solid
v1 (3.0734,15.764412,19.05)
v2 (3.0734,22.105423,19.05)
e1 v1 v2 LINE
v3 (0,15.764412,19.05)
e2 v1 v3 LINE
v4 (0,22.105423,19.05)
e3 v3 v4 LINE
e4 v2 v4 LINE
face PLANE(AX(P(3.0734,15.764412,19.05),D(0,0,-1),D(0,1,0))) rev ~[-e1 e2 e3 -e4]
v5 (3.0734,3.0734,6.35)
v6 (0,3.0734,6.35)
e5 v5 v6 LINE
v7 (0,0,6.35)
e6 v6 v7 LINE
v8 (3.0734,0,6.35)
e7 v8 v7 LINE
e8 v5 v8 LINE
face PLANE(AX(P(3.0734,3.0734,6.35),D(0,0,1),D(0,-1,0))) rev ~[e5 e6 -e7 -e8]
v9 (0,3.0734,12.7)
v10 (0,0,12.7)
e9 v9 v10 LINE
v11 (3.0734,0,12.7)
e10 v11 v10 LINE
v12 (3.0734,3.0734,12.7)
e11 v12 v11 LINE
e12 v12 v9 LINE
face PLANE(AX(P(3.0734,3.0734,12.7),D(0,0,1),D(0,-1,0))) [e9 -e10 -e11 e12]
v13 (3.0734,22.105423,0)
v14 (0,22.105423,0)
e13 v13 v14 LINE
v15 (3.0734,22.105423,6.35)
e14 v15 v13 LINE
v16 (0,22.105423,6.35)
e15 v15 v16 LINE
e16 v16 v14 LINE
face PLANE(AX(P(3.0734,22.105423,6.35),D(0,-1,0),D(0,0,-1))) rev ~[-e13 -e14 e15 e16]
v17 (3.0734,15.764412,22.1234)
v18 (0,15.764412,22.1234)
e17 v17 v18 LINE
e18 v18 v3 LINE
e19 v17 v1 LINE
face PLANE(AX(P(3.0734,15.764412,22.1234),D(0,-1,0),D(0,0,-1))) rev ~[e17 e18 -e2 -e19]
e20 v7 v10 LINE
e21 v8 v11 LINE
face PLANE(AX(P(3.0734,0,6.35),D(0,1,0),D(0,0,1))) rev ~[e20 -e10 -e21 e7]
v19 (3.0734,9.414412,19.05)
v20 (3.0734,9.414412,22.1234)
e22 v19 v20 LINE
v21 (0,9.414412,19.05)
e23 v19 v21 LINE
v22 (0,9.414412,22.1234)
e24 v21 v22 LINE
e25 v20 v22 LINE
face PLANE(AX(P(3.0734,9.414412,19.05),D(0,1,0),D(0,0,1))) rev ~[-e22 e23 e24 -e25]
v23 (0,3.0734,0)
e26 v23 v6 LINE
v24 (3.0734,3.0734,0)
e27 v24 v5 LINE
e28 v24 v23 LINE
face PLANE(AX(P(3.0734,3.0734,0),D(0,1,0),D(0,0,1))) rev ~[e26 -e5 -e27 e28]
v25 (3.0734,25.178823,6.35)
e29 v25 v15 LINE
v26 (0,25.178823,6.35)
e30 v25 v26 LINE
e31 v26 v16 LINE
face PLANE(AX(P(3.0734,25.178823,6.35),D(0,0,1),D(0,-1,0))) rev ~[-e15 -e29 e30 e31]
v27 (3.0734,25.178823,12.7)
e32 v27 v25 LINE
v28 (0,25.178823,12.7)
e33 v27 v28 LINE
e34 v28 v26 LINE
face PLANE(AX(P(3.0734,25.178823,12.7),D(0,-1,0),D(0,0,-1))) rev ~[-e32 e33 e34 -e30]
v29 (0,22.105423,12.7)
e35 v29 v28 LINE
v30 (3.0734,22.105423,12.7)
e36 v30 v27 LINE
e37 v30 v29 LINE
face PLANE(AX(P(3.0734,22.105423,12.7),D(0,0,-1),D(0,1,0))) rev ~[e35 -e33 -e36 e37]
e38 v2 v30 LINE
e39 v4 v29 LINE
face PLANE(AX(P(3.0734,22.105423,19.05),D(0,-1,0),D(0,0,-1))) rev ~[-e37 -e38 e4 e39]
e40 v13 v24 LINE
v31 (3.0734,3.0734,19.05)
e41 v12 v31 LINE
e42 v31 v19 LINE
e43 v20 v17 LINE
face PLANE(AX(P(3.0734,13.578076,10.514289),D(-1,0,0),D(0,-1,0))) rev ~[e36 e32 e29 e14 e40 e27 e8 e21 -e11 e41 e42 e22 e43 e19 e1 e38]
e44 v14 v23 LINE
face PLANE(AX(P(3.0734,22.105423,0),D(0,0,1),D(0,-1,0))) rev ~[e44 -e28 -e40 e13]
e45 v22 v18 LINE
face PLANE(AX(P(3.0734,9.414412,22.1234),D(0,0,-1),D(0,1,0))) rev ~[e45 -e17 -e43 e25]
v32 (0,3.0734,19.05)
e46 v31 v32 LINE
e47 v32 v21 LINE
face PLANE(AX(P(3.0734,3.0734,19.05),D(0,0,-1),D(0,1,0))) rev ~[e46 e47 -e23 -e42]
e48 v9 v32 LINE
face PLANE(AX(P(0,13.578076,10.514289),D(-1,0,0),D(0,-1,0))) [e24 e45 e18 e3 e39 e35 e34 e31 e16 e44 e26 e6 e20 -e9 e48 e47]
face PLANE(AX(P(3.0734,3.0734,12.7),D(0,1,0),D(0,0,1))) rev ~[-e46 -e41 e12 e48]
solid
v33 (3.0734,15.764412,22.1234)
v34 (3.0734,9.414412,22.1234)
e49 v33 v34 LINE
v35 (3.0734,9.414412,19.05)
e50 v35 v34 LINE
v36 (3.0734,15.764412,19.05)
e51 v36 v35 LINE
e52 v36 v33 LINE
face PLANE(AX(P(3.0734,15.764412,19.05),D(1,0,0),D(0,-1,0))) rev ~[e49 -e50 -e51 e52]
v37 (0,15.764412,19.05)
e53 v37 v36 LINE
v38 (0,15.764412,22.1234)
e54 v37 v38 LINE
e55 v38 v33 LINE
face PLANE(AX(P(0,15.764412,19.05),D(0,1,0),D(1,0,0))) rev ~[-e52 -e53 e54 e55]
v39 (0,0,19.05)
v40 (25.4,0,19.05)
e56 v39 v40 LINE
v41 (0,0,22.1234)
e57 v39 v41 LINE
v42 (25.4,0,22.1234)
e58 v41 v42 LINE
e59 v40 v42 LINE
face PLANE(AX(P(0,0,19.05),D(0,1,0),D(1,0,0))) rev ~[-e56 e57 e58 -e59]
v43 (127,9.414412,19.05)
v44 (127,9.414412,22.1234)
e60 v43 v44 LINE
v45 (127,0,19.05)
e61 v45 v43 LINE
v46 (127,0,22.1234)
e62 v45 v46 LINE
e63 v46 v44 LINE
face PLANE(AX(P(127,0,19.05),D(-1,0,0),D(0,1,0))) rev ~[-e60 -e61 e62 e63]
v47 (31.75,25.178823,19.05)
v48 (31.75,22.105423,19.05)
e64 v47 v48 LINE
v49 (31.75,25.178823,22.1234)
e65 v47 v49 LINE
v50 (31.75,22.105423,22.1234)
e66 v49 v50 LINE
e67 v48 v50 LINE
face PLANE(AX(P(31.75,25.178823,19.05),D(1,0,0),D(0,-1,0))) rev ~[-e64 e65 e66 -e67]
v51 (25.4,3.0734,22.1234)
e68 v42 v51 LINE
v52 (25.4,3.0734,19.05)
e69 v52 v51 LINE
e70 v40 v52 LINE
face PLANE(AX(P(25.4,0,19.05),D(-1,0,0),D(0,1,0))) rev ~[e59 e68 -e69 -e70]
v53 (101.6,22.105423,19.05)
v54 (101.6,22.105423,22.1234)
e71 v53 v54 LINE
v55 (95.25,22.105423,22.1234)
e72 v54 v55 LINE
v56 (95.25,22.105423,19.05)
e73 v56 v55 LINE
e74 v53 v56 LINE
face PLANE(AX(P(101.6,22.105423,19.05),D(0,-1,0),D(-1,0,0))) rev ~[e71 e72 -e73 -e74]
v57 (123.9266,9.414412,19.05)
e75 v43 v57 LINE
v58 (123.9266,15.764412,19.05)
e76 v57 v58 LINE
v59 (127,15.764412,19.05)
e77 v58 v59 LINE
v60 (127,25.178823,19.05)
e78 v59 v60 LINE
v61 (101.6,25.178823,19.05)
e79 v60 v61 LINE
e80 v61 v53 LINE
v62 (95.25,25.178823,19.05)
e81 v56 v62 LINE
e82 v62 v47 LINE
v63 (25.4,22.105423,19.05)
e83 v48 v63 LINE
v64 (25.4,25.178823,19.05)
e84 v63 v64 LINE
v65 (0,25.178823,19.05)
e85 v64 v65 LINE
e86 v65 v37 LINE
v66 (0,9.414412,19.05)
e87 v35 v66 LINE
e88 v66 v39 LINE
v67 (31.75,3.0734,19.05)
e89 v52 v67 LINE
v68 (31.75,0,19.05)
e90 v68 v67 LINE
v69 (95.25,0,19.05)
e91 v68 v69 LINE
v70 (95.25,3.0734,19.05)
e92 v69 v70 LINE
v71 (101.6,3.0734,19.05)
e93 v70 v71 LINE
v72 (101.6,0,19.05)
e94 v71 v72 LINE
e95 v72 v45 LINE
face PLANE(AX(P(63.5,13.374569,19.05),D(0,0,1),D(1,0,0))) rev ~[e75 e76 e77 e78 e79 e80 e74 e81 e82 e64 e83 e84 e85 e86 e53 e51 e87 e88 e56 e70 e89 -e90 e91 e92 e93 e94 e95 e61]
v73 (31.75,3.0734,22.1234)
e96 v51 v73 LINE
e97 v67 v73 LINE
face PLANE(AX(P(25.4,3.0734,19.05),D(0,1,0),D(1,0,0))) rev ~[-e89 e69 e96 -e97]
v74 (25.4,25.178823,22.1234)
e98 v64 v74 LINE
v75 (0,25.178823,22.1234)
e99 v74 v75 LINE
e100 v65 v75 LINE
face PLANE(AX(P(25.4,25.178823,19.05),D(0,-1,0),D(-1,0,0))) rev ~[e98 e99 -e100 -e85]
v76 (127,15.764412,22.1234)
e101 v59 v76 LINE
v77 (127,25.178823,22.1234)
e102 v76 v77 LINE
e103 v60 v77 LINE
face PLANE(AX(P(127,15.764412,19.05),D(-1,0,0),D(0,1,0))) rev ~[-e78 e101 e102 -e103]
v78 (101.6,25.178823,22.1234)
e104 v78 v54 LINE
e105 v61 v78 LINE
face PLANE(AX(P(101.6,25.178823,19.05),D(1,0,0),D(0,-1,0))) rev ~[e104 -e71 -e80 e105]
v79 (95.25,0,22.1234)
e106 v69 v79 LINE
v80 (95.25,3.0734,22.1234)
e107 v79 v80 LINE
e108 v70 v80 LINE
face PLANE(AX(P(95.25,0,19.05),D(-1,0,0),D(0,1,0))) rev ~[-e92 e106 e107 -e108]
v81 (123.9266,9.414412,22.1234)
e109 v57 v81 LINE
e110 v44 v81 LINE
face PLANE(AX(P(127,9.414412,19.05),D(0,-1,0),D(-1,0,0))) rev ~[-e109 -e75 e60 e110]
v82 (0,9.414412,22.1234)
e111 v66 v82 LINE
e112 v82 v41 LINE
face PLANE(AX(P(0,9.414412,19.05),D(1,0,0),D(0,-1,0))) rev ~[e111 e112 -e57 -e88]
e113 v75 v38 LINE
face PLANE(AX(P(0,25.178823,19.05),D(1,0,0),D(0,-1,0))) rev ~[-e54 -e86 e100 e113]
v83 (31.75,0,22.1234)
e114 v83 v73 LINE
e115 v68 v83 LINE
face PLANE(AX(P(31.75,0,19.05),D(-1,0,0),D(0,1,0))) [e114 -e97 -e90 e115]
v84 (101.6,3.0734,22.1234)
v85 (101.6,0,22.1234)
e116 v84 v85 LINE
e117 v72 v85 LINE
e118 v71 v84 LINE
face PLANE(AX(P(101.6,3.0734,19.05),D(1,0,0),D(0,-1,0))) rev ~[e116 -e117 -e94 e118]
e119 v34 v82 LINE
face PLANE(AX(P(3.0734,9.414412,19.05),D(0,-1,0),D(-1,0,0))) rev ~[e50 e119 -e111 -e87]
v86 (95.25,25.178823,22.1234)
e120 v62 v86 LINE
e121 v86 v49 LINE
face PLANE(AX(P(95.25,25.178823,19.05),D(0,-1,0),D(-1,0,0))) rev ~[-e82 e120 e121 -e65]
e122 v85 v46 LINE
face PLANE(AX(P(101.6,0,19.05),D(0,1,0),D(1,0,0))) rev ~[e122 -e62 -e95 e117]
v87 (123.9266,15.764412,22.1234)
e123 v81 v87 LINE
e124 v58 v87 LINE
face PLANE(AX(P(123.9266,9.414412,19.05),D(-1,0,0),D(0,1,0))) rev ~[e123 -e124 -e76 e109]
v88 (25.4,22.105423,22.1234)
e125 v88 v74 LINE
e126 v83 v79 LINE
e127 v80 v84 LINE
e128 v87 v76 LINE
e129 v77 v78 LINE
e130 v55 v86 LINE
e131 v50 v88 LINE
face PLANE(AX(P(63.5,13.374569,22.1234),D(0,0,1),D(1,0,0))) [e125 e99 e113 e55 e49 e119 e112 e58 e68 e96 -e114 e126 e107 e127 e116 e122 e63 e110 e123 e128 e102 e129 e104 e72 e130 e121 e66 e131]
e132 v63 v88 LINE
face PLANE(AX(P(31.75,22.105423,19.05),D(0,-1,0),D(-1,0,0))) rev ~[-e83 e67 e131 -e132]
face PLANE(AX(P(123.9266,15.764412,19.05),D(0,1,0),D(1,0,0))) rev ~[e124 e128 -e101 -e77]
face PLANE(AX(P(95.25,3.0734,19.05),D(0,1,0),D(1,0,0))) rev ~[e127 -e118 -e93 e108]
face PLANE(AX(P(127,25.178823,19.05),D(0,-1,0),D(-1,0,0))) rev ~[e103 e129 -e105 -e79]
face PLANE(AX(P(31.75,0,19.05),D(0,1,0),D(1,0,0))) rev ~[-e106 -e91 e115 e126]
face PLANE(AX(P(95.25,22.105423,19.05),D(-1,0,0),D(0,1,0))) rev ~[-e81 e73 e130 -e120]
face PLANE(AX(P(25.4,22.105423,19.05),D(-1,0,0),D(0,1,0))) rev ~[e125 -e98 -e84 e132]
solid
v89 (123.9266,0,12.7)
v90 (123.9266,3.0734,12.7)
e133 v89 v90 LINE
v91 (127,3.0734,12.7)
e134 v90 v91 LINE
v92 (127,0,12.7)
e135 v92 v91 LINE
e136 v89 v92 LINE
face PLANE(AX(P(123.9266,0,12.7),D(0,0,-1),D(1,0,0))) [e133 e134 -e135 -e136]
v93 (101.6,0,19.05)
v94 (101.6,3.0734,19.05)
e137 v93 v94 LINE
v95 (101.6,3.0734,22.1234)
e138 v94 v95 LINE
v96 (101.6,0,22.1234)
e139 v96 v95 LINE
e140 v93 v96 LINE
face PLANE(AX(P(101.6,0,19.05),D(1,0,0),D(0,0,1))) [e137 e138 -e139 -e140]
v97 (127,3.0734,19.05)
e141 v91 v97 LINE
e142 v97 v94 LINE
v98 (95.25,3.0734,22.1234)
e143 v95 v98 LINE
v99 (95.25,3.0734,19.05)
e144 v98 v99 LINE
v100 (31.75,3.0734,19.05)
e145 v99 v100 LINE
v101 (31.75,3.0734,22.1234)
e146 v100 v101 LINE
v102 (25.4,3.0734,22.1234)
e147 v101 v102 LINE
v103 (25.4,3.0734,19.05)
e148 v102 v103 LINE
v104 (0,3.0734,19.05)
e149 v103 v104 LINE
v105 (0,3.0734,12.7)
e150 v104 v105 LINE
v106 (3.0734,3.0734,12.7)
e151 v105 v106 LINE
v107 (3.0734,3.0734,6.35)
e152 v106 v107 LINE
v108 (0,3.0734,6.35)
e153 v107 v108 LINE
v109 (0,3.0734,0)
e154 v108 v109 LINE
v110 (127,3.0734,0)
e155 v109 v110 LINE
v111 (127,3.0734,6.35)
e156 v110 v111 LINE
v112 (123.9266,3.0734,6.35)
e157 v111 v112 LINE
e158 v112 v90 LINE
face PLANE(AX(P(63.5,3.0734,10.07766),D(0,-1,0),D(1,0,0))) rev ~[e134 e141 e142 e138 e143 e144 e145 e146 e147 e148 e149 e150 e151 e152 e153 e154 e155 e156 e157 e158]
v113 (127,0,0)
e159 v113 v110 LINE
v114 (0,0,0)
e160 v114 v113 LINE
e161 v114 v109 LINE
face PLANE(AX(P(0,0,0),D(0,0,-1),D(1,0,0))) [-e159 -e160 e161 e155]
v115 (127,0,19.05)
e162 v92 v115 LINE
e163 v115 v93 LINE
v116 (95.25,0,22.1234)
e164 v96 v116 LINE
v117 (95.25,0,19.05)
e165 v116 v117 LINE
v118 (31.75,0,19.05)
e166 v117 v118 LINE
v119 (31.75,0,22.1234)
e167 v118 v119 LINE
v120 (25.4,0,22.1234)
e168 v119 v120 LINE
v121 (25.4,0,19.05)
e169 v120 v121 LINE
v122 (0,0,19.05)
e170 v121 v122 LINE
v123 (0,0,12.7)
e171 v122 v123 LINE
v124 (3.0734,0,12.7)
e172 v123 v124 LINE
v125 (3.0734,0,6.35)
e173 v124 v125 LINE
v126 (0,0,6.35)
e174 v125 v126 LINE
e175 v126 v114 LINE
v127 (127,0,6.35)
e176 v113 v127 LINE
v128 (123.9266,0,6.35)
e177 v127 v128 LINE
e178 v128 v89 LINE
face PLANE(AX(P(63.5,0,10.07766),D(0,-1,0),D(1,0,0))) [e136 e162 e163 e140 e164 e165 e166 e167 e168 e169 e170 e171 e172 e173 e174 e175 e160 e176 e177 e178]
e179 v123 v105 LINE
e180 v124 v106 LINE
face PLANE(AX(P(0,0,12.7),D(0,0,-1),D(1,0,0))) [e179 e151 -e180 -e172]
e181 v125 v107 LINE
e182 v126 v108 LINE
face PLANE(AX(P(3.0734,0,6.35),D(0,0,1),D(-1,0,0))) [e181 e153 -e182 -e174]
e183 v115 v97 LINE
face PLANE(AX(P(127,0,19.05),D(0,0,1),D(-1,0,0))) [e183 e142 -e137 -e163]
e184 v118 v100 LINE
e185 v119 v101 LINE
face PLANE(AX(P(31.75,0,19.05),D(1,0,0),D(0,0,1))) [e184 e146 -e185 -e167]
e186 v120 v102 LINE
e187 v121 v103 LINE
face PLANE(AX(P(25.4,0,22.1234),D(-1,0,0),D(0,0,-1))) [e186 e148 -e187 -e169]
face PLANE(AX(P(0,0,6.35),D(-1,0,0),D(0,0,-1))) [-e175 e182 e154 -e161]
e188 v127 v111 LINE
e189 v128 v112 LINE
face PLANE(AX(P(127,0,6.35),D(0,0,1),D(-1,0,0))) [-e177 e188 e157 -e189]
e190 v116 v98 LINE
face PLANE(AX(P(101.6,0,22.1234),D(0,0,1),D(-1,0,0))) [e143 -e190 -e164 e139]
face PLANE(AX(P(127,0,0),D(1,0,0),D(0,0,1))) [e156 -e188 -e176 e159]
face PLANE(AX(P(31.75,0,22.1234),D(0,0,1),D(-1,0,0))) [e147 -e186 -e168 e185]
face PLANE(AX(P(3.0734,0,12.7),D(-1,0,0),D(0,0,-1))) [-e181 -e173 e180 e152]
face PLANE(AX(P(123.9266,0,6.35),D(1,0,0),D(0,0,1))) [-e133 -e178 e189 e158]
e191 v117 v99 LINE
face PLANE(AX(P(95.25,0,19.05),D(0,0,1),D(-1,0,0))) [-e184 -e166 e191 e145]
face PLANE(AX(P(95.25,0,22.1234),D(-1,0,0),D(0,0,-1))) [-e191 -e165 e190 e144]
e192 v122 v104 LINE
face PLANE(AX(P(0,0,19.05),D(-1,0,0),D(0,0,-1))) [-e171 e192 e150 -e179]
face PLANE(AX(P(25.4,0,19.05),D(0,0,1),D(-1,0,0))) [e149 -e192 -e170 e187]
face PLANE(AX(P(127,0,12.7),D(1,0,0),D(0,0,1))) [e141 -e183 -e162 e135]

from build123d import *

# Parameters (mm, degrees)
F2_DEPTH = 3.0734
F3_W     = 63.5
F3_H     = 3.0734
F4_DEPTH = 3.0734
F5_W     = 3.0734
F5_H     = 6.35
F6_DEPTH = 3.0734


# Not quite as in the source:
# - a variable given as a bare number and used for a length is read in inches; the dataset says mm whatever the document's units were


with BuildPart() as f2:
    # F1 (on Front) → F2 (new body)
    with BuildSketch(Plane.XZ):
        Polygon((0, 6.35), (0, 0), (127, 0), (127, 6.35), (123.9266, 6.35), (123.9266, 12.7), (127, 12.7), (127, 19.05), (101.6, 19.05), (101.6, 22.1234), (95.25, 22.1234), (95.25, 19.05), (31.75, 19.05), (31.75, 22.1234), (25.4, 22.1234), (25.4, 19.05), (0, 19.05), (0, 12.7), (3.0734, 12.7), (3.0734, 6.35), align=None)
    extrude(amount=-F2_DEPTH)


with BuildPart() as f4:
    # F3 (on face) → F4 (new body)
    with BuildSketch(Plane.XY.offset(19.05)):
        Polygon((0, 0), (25.4, 0), (25.4, 3.0734), (31.75, 3.0734), (95.25, 3.0734), (101.6, 3.0734), (101.6, 0), (127, 0), (127, 9.414411702), (123.9266, 9.414411702), (123.9266, 15.764411702), (127, 15.764411702), (127, 25.178823404), (101.6, 25.178823404), (101.6, 22.105423404), (95.25, 22.105423404), (95.25, 25.178823404), (31.75, 25.178823404), (31.75, 22.105423404), (25.4, 22.105423404), (25.4, 25.178823404), (0, 25.178823404), (0, 15.764411702), (3.0734, 15.764411702), (3.0734, 9.414411702), (0, 9.414411702), align=None)
        with Locations((63.5, 1.5367)):
            Rectangle(F3_W, F3_H)
    extrude(amount=F4_DEPTH)


with BuildPart() as f6:
    # F5 (on face) → F6 (new body)
    with BuildSketch(Plane(origin=(3.0734, 0, 0), x_dir=(0, -1, 0), z_dir=(-1, 0, 0))):
        Polygon((-3.0734, 0), (-3.0734, 6.35), (-3.0734, 12.7), (-3.0734, 19.05), (-9.414411702, 19.05), (-9.414411702, 22.1234), (-15.764411702, 22.1234), (-15.764411702, 19.05), (-22.105423404, 19.05), (-22.105423404, 12.7), (-25.178823404, 12.7), (-25.178823404, 6.35), (-22.105423404, 6.35), (-22.105423404, 0), align=None)
        with Locations((-1.5367, 9.525)):
            Rectangle(F5_W, F5_H)
    extrude(amount=F6_DEPTH)


solid = Compound([f2.part, f4.part, f6.part])
